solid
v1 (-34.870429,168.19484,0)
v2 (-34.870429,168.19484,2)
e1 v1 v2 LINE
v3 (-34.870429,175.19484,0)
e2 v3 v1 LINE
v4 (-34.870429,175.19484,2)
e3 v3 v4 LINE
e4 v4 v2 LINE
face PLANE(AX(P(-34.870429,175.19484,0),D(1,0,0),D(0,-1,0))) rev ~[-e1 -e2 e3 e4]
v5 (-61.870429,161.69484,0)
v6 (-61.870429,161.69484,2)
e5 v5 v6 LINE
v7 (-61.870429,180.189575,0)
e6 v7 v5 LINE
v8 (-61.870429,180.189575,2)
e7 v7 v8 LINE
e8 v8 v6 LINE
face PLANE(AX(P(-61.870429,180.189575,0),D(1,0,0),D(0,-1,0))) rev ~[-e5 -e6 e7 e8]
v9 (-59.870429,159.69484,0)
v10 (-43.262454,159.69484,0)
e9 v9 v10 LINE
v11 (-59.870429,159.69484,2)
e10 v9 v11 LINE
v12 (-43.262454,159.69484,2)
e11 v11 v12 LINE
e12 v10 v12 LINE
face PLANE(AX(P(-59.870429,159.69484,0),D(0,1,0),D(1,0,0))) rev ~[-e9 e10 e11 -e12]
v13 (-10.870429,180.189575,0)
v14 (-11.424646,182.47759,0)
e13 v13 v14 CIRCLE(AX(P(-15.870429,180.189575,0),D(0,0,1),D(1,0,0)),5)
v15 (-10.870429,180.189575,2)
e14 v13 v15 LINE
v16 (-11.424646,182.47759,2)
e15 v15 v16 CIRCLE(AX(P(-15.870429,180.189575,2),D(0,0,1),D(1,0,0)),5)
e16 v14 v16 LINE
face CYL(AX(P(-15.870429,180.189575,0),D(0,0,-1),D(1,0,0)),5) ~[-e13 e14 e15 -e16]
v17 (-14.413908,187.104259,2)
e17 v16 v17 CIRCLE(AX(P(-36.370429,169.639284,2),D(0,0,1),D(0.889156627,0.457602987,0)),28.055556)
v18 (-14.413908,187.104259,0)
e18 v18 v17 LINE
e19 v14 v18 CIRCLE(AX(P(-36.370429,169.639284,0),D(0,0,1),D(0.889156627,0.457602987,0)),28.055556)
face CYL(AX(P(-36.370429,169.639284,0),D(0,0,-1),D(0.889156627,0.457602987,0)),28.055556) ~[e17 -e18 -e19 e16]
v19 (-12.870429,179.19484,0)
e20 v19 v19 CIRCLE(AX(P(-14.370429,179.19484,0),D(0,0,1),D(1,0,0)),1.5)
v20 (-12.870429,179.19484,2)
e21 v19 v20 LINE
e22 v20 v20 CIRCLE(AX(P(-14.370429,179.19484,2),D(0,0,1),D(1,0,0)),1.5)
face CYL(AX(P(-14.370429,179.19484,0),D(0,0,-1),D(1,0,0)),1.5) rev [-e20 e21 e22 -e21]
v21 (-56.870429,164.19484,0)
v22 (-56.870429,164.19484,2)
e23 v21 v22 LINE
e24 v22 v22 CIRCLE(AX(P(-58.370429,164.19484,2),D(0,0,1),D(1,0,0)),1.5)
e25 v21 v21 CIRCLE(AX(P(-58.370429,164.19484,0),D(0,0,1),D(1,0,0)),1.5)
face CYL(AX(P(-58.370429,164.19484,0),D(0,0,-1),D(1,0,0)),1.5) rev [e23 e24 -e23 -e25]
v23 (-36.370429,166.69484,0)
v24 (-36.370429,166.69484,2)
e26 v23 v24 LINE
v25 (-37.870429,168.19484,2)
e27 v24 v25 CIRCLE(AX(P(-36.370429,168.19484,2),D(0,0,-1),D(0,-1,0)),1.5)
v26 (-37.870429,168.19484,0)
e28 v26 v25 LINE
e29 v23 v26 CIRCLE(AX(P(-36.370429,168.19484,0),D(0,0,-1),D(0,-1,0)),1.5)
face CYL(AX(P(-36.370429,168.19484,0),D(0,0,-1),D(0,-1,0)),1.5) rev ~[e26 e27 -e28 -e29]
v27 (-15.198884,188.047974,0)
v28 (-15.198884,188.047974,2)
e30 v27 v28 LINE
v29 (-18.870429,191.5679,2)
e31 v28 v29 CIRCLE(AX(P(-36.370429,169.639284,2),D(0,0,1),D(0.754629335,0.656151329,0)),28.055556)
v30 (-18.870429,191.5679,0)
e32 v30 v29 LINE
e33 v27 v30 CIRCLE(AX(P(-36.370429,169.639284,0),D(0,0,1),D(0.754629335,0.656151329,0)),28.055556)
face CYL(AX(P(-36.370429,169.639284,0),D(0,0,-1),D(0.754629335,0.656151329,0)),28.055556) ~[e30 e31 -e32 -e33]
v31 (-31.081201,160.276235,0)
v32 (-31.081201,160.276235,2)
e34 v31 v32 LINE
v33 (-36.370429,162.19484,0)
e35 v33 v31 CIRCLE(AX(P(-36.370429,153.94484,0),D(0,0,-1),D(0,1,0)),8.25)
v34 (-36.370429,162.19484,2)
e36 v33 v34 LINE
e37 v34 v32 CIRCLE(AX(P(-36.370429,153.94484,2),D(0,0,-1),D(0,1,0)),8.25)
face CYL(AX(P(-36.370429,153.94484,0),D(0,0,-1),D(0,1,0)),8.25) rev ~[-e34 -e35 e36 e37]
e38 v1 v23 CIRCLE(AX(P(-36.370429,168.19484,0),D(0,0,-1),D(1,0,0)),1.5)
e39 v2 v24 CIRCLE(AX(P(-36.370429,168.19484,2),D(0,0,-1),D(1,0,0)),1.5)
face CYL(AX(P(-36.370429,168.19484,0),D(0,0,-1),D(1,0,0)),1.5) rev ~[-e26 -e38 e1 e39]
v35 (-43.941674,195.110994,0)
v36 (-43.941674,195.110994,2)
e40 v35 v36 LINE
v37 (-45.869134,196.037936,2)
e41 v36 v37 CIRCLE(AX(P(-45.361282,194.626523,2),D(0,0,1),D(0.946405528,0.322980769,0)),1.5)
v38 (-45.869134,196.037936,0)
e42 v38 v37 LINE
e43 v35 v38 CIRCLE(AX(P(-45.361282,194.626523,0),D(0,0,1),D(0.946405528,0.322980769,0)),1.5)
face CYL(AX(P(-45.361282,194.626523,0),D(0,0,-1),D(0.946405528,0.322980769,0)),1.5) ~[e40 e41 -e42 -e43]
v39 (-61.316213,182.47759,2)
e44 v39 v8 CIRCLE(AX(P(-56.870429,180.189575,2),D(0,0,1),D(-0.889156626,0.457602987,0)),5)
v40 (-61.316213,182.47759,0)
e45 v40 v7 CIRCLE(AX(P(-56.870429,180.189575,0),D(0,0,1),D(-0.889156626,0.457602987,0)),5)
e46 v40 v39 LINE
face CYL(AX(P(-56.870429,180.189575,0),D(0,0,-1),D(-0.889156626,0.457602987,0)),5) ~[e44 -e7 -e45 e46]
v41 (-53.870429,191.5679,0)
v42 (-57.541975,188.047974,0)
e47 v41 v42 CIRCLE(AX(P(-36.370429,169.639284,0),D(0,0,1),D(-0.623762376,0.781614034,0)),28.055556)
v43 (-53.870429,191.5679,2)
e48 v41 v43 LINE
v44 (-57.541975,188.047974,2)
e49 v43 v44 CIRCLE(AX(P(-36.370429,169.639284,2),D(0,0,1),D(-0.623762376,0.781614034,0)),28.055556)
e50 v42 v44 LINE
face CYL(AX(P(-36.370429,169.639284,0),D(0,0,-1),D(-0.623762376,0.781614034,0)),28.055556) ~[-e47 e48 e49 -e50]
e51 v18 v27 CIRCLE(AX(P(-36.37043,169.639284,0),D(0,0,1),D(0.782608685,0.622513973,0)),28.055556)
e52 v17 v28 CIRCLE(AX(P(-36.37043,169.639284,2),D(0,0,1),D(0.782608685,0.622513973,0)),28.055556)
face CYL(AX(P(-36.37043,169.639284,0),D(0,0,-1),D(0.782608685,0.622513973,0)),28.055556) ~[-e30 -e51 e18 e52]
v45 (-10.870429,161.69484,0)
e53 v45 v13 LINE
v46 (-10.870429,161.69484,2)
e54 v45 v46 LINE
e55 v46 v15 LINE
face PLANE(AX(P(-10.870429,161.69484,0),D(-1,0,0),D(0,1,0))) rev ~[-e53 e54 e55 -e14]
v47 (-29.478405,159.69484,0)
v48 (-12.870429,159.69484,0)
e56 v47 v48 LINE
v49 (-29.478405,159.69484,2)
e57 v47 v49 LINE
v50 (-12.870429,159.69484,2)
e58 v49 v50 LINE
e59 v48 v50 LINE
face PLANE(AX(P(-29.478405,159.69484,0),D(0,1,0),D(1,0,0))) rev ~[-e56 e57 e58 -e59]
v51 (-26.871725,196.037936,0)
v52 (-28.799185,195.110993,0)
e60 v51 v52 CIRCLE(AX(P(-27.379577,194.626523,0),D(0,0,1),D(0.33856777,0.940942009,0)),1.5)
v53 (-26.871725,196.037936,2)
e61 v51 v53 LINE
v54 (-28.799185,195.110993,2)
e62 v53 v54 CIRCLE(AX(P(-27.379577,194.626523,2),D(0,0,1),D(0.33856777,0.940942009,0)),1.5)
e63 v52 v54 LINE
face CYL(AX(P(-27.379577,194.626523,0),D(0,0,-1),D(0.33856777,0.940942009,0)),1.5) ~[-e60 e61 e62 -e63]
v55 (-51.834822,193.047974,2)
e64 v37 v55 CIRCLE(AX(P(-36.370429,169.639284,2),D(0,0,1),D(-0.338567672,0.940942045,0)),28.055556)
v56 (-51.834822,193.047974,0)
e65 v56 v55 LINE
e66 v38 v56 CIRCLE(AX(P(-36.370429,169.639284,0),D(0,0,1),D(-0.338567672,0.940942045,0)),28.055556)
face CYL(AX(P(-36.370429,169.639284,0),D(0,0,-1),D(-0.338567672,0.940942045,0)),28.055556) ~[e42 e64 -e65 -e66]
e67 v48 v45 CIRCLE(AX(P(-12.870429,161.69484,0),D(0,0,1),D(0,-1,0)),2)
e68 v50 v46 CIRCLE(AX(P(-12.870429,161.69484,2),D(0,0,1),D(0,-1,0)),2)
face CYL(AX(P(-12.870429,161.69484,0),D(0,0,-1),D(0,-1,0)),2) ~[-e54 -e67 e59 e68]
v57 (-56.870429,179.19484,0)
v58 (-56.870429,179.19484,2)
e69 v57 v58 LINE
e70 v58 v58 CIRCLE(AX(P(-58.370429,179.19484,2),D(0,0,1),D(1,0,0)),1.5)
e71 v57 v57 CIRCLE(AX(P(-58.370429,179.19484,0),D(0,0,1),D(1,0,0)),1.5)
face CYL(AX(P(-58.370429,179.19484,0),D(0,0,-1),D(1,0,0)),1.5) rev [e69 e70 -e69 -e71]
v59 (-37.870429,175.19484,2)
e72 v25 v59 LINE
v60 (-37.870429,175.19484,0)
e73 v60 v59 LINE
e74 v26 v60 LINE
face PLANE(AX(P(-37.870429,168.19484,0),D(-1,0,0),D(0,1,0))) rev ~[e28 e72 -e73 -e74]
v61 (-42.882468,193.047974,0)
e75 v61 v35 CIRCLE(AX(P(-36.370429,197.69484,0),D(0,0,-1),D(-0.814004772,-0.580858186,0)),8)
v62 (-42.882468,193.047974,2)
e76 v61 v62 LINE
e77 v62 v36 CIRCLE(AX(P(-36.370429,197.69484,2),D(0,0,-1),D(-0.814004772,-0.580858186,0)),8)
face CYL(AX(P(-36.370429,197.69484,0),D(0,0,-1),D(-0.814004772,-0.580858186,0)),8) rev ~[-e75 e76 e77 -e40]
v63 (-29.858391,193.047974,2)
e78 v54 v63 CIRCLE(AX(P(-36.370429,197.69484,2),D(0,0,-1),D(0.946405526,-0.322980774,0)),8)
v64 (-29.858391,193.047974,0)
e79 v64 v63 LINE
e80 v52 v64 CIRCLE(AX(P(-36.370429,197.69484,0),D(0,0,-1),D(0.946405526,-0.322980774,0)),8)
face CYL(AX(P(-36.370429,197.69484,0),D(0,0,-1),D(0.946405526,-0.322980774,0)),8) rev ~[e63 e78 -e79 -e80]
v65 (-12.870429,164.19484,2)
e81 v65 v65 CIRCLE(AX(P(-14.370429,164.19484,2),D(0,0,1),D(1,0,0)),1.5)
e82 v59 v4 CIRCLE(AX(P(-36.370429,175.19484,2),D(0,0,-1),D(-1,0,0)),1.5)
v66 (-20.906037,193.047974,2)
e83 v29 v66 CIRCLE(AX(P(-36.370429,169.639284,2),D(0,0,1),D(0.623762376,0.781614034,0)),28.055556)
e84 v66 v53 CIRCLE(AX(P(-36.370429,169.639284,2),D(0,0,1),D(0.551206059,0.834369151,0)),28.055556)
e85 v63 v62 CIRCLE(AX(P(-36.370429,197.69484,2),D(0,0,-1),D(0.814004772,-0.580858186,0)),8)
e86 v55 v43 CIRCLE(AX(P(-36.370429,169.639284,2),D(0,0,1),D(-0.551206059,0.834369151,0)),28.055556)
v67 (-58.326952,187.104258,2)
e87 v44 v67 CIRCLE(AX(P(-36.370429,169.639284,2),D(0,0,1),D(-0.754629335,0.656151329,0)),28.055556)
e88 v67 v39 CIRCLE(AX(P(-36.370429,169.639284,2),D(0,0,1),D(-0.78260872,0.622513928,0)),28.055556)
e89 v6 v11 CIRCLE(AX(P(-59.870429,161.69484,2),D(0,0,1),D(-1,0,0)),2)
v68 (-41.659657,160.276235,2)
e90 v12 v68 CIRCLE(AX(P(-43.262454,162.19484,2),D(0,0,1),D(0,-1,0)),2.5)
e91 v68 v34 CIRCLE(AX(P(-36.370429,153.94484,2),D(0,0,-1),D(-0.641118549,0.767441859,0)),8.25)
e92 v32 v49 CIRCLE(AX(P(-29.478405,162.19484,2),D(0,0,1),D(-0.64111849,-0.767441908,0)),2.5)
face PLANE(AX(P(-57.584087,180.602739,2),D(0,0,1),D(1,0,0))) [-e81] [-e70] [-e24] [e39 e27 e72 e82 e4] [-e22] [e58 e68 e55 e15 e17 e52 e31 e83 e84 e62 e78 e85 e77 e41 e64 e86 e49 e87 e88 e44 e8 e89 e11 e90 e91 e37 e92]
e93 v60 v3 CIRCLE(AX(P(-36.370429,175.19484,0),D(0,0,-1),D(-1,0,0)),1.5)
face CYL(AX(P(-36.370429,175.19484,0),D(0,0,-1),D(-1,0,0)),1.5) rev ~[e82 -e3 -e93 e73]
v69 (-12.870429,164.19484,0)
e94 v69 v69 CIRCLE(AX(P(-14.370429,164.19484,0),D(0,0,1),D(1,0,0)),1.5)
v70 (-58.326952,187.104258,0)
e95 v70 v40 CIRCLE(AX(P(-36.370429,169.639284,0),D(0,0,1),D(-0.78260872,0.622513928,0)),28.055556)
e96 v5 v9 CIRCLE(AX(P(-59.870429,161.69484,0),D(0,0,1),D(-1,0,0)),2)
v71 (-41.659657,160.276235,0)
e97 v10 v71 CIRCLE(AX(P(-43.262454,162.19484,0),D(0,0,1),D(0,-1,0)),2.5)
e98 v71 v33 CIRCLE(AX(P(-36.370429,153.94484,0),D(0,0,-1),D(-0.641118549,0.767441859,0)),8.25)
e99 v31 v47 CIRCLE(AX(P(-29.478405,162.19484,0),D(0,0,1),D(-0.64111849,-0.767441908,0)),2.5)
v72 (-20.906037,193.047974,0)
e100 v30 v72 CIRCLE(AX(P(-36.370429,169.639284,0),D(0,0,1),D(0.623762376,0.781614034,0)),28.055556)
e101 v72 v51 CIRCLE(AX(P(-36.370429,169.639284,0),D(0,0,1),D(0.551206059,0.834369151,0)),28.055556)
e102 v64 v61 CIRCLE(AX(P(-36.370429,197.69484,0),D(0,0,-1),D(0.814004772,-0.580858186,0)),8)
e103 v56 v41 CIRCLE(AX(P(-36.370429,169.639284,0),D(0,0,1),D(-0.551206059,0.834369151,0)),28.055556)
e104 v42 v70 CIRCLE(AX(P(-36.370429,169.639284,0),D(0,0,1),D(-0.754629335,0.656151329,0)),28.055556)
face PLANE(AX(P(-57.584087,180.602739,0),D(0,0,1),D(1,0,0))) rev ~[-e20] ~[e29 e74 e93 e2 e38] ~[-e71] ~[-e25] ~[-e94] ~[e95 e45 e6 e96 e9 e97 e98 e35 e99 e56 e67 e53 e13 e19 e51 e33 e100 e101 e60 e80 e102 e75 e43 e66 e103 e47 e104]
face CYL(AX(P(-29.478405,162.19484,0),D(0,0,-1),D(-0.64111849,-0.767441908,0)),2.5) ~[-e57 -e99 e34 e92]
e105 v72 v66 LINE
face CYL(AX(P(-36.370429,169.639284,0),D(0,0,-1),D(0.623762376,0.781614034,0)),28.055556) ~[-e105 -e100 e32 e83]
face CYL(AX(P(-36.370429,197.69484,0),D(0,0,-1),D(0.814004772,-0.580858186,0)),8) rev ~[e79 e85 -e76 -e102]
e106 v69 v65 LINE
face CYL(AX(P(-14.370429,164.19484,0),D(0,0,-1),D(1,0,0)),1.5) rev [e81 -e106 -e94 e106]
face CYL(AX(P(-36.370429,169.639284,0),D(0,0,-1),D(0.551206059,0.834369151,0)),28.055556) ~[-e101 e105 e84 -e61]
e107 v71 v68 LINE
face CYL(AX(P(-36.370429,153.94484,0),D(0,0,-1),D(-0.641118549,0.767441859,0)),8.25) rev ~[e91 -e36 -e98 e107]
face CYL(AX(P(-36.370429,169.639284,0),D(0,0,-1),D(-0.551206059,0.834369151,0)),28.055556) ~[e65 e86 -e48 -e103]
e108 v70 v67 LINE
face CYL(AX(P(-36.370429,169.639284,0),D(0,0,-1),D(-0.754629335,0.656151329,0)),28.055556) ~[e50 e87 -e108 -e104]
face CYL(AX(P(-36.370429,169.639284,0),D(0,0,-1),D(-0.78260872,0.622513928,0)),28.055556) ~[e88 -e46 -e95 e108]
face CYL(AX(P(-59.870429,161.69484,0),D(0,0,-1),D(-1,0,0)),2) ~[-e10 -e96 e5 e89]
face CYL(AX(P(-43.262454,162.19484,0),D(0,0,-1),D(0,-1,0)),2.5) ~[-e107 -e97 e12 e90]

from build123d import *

# Parameters (mm, degrees)
F0_R     = 1.5
F1_DEPTH = 2


# Not quite as in the source:
# - a feature names something its author has since deleted; it is built from what else it names


with BuildPart() as f1:
    # F0 (on Top) → F1 (new body)
    with BuildSketch(Plane.XY):
        with BuildLine():
            Line((-61.8704294452, 175.1948396463), (-53.8704294452, 175.1948396463))
            Line((-53.8704294452, 175.1948396463), (-53.8704294452, 185.547974161))
            ThreePointArc((-53.8704294452, 185.547974161), (-57.1946545112, 183.1877510697), (-58.3269518777, 187.1042581875))
            ThreePointArc((-58.3269518777, 187.1042581875), (-59.9354051762, 184.8644644288), (-61.3162125777, 182.4775901096))
            ThreePointArc((-61.3162125777, 182.4775901096), (-61.7299003867, 181.366665728), (-61.8704294452, 180.1895751756))
            Line((-61.8704294452, 180.1895751756), (-61.8704294452, 175.1948396463))
        make_face()
        with Locations((-58.3704294452, 179.1948396463)):
            Circle(F0_R, mode=Mode.SUBTRACT)
        with BuildLine():
            ThreePointArc((-58.3269518777, 187.1042581875), (-57.1946545112, 183.1877510697), (-53.8704294452, 185.547974161))
            ThreePointArc((-53.8704294452, 185.547974161), (-54.6026624922, 187.315741114), (-56.3704294452, 188.047974161))
            ThreePointArc((-56.3704294452, 188.047974161), (-57.4565440648, 187.7997190473), (-58.3269518777, 187.1042581875))
        make_face()
        with BuildLine():
            Line((-18.8704294452, 175.1948396463), (-10.8704294452, 175.1948396463))
            Line((-10.8704294452, 175.1948396463), (-10.8704294452, 180.1895751756))
            ThreePointArc((-10.8704294452, 180.1895751756), (-11.0109585037, 181.366665728), (-11.4246463127, 182.4775901096))
            ThreePointArc((-11.4246463127, 182.4775901096), (-12.8054541473, 184.8644650992), (-14.4139080064, 187.1042594368))
            ThreePointArc((-14.4139080064, 187.1042594368), (-14.010206617, 186.3721999805), (-13.8704294452, 185.547974161))
            ThreePointArc((-13.8704294452, 185.547974161), (-16.3704294452, 183.047974161), (-18.8704294452, 185.547974161))
            Line((-18.8704294452, 185.547974161), (-18.8704294452, 175.1948396463))
        make_face()
        with Locations((-14.3704294452, 179.1948396463)):
            Circle(F0_R, mode=Mode.SUBTRACT)
        with BuildLine():
            ThreePointArc((-16.3704294452, 188.047974161), (-18.1381963982, 187.315741114), (-18.8704294452, 185.547974161))
            ThreePointArc((-18.8704294452, 185.547974161), (-16.3704294452, 183.047974161), (-13.8704294452, 185.547974161))
            ThreePointArc((-13.8704294452, 185.547974161), (-14.010206617, 186.3721999805), (-14.4139080064, 187.1042594368))
            ThreePointArc((-14.4139080064, 187.1042594368), (-15.2843155445, 187.7997193941), (-16.3704294452, 188.047974161))
        make_face()
        with BuildLine():
            Line((-36.3704294452, 166.6948396463), (-36.3704294452, 165.1948396463))
            Line((-36.3704294452, 165.1948396463), (-23.8704294452, 165.1948396463))
            ThreePointArc((-23.8704294452, 165.1948396463), (-20.3348955393, 166.6593057403), (-18.8704294452, 170.1948396463))
            Line((-18.8704294452, 170.1948396463), (-18.8704294452, 175.1948396463))
            Line((-18.8704294452, 175.1948396463), (-34.8704294452, 175.1948396463))
            Line((-34.8704294452, 175.1948396463), (-34.8704294452, 168.1948396463))
            ThreePointArc((-34.8704294452, 168.1948396463), (-35.3097692734, 167.1341794745), (-36.3704294452, 166.6948396463))
        make_face()
        with BuildLine():
            Line((-48.8704294452, 165.1948396463), (-36.3704294452, 165.1948396463))
            Line((-36.3704294452, 165.1948396463), (-36.3704294452, 166.6948396463))
            ThreePointArc((-36.3704294452, 166.6948396463), (-37.431089617, 167.1341794745), (-37.8704294452, 168.1948396463))
            Line((-37.8704294452, 168.1948396463), (-37.8704294452, 175.1948396463))
            Line((-37.8704294452, 175.1948396463), (-53.8704294452, 175.1948396463))
            Line((-53.8704294452, 175.1948396463), (-53.8704294452, 170.1948396463))
            ThreePointArc((-53.8704294452, 170.1948396463), (-52.4059633511, 166.6593057403), (-48.8704294452, 165.1948396463))
        make_face()
        with BuildLine():
            Line((-34.8704294452, 175.1948396463), (-18.8704294452, 175.1948396463))
            Line((-18.8704294452, 175.1948396463), (-18.8704294452, 185.547974161))
            Line((-18.8704294452, 185.547974161), (-18.8704294452, 188.047974161))
            Line((-18.8704294452, 188.047974161), (-53.8704294452, 188.047974161))
            Line((-53.8704294452, 188.047974161), (-53.8704294452, 185.547974161))
            Line((-53.8704294452, 185.547974161), (-53.8704294452, 175.1948396463))
            Line((-53.8704294452, 175.1948396463), (-37.8704294452, 175.1948396463))
            ThreePointArc((-37.8704294452, 175.1948396463), (-36.3704294452, 176.6948396463), (-34.8704294452, 175.1948396463))
        make_face()
        with BuildLine():
            ThreePointArc((-41.6596574736, 160.2762349793), (-39.1836561071, 161.7003703018), (-36.3704294452, 162.1948396463))
            Line((-36.3704294452, 162.1948396463), (-36.3704294452, 165.1948396463))
            Line((-36.3704294452, 165.1948396463), (-48.8704294452, 165.1948396463))
            ThreePointArc((-48.8704294452, 165.1948396463), (-52.4059633511, 166.6593057403), (-53.8704294452, 170.1948396463))
            Line((-53.8704294452, 170.1948396463), (-53.8704294452, 175.1948396463))
            Line((-53.8704294452, 175.1948396463), (-61.8704294452, 175.1948396463))
            Line((-61.8704294452, 175.1948396463), (-61.8704294452, 161.6948396463))
            ThreePointArc((-61.8704294452, 161.6948396463), (-61.2846430076, 160.2806260839), (-59.8704294452, 159.6948396463))
            Line((-59.8704294452, 159.6948396463), (-43.2624538212, 159.6948396463))
            ThreePointArc((-43.2624538212, 159.6948396463), (-45.0302207742, 163.9626065992), (-40.7624538212, 162.1948396463))
            ThreePointArc((-40.7624538212, 162.1948396463), (-40.997835656, 161.13582852), (-41.6596574736, 160.2762349793))
        make_face()
        with Locations((-58.3704294452, 164.1948396463)):
            Circle(F0_R, mode=Mode.SUBTRACT)
        with BuildLine():
            ThreePointArc((-43.2624538212, 159.6948396463), (-42.4099609085, 159.8446788361), (-41.6596574736, 160.2762349793))
            ThreePointArc((-41.6596574736, 160.2762349793), (-40.997835656, 161.13582852), (-40.7624538212, 162.1948396463))
            ThreePointArc((-40.7624538212, 162.1948396463), (-45.0302207742, 163.9626065992), (-43.2624538212, 159.6948396463))
        make_face()
        with BuildLine():
            ThreePointArc((-56.3704294452, 188.047974161), (-54.6026624922, 187.315741114), (-53.8704294452, 185.547974161))
            Line((-53.8704294452, 185.547974161), (-53.8704294452, 188.047974161))
            Line((-53.8704294452, 188.047974161), (-56.3704294452, 188.047974161))
        make_face()
        with BuildLine():
            Line((-18.8704294452, 188.047974161), (-18.8704294452, 185.547974161))
            ThreePointArc((-18.8704294452, 185.547974161), (-18.1381963982, 187.315741114), (-16.3704294452, 188.047974161))
            Line((-16.3704294452, 188.047974161), (-18.8704294452, 188.047974161))
        make_face()
        with BuildLine():
            ThreePointArc((-26.9784050691, 162.1948396463), (-27.7106381162, 160.4270726933), (-29.4784050691, 159.6948396463))
            Line((-29.4784050691, 159.6948396463), (-12.8704294452, 159.6948396463))
            ThreePointArc((-12.8704294452, 159.6948396463), (-11.4562158828, 160.2806260839), (-10.8704294452, 161.6948396463))
            Line((-10.8704294452, 161.6948396463), (-10.8704294452, 175.1948396463))
            Line((-10.8704294452, 175.1948396463), (-18.8704294452, 175.1948396463))
            Line((-18.8704294452, 175.1948396463), (-18.8704294452, 170.1948396463))
            ThreePointArc((-18.8704294452, 170.1948396463), (-20.3348955393, 166.6593057403), (-23.8704294452, 165.1948396463))
            Line((-23.8704294452, 165.1948396463), (-36.3704294452, 165.1948396463))
            Line((-36.3704294452, 165.1948396463), (-36.3704294452, 162.1948396463))
            ThreePointArc((-36.3704294452, 162.1948396463), (-33.557202708, 161.7003702745), (-31.0812012938, 160.2762348766))
            ThreePointArc((-31.0812012938, 160.2762348766), (-30.5374162679, 164.4594577776), (-26.9784050691, 162.1948396463))
        make_face()
        with Locations((-14.3704294452, 164.1948396463)):
            Circle(F0_R, mode=Mode.SUBTRACT)
        with BuildLine():
            ThreePointArc((-31.0812012938, 160.2762348766), (-30.3308979066, 159.8446788088), (-29.4784050691, 159.6948396463))
            ThreePointArc((-29.4784050691, 159.6948396463), (-27.7106381162, 160.4270726933), (-26.9784050691, 162.1948396463))
            ThreePointArc((-26.9784050691, 162.1948396463), (-30.5374162679, 164.4594577776), (-31.0812012938, 160.2762348766))
        make_face()
        with BuildLine():
            Line((-53.8704294452, 188.047974161), (-18.8704294452, 188.047974161))
            Line((-18.8704294452, 188.047974161), (-18.8704294452, 191.5679000418))
            ThreePointArc((-18.8704294452, 191.5679000418), (-19.871628172, 192.3307748764), (-20.9060372255, 193.047974161))
            Line((-20.9060372255, 193.047974161), (-29.8583912725, 193.047974161))
            ThreePointArc((-29.8583912725, 193.047974161), (-36.3704294452, 189.6948396463), (-42.8824676178, 193.047974161))
            Line((-42.8824676178, 193.047974161), (-51.8348216648, 193.047974161))
            ThreePointArc((-51.8348216648, 193.047974161), (-52.8692307184, 192.3307748764), (-53.8704294452, 191.5679000418))
            Line((-53.8704294452, 191.5679000418), (-53.8704294452, 188.047974161))
        make_face()
        with BuildLine():
            Line((-56.3704294452, 188.047974161), (-53.8704294452, 188.047974161))
            Line((-53.8704294452, 188.047974161), (-53.8704294452, 191.5679000418))
            ThreePointArc((-53.8704294452, 191.5679000418), (-55.7861337119, 189.8913117759), (-57.5419746752, 188.047974161))
            Line((-57.5419746752, 188.047974161), (-56.3704294452, 188.047974161))
        make_face()
        with BuildLine():
            Line((-18.8704294452, 191.5679000418), (-18.8704294452, 188.047974161))
            Line((-18.8704294452, 188.047974161), (-16.3704294452, 188.047974161))
            Line((-16.3704294452, 188.047974161), (-15.1988842152, 188.047974161))
            ThreePointArc((-15.1988842152, 188.047974161), (-16.9547251785, 189.8913117759), (-18.8704294452, 191.5679000418))
        make_face()
        with BuildLine():
            ThreePointArc((-58.3269518777, 187.1042581875), (-57.4565440648, 187.7997190473), (-56.3704294452, 188.047974161))
            Line((-56.3704294452, 188.047974161), (-57.5419746752, 188.047974161))
            ThreePointArc((-57.5419746752, 188.047974161), (-57.939625189, 187.5804098217), (-58.3269518777, 187.1042581875))
        make_face()
        with BuildLine():
            Line((-15.1988842152, 188.047974161), (-16.3704294452, 188.047974161))
            ThreePointArc((-16.3704294452, 188.047974161), (-15.2843155445, 187.7997193941), (-14.4139080064, 187.1042594368))
            ThreePointArc((-14.4139080064, 187.1042594368), (-14.8012342118, 187.5804104353), (-15.1988842152, 188.047974161))
        make_face()
        with BuildLine():
            Line((-29.8583912725, 193.047974161), (-20.9060372255, 193.047974161))
            ThreePointArc((-20.9060372255, 193.047974161), (-23.799669125, 194.7209543402), (-26.8717251154, 196.0379358287))
            ThreePointArc((-26.8717251154, 196.0379358287), (-26.1524301853, 195.489141652), (-25.8795767704, 194.6265228146))
            ThreePointArc((-25.8795767704, 194.6265228146), (-27.6251244235, 193.1467571743), (-28.7991852371, 195.1109934548))
            ThreePointArc((-28.7991852371, 195.1109934548), (-29.2536378362, 194.0408996913), (-29.8583912725, 193.047974161))
        make_face()
        with BuildLine():
            ThreePointArc((-25.8795767704, 194.6265228146), (-26.1524301853, 195.489141652), (-26.8717251154, 196.0379358287))
            ThreePointArc((-26.8717251154, 196.0379358287), (-28.0296772719, 195.97832507), (-28.7991852371, 195.1109934548))
            ThreePointArc((-28.7991852371, 195.1109934548), (-27.6251244235, 193.1467571743), (-25.8795767704, 194.6265228146))
        make_face()
        with BuildLine():
            ThreePointArc((-43.9416738286, 195.1109939684), (-44.7111817722, 195.978325144), (-45.8691335854, 196.037935897))
            ThreePointArc((-45.8691335854, 196.037935897), (-46.2239010399, 193.3993762875), (-43.86128212, 194.6265228146))
            ThreePointArc((-43.86128212, 194.6265228146), (-43.8815165242, 194.8720707354), (-43.9416738286, 195.1109939684))
        make_face()
        with BuildLine():
            ThreePointArc((-45.8691335854, 196.037935897), (-48.9411896753, 194.7209543853), (-51.8348216648, 193.047974161))
            Line((-51.8348216648, 193.047974161), (-42.8824676178, 193.047974161))
            ThreePointArc((-42.8824676178, 193.047974161), (-43.4872211781, 194.0408999327), (-43.9416738286, 195.1109939684))
            ThreePointArc((-43.9416738286, 195.1109939684), (-43.8815165242, 194.8720707354), (-43.86128212, 194.6265228146))
            ThreePointArc((-43.86128212, 194.6265228146), (-46.2239010399, 193.3993762875), (-45.8691335854, 196.037935897))
        make_face()
    extrude(amount=F1_DEPTH)


solid = f1.part
